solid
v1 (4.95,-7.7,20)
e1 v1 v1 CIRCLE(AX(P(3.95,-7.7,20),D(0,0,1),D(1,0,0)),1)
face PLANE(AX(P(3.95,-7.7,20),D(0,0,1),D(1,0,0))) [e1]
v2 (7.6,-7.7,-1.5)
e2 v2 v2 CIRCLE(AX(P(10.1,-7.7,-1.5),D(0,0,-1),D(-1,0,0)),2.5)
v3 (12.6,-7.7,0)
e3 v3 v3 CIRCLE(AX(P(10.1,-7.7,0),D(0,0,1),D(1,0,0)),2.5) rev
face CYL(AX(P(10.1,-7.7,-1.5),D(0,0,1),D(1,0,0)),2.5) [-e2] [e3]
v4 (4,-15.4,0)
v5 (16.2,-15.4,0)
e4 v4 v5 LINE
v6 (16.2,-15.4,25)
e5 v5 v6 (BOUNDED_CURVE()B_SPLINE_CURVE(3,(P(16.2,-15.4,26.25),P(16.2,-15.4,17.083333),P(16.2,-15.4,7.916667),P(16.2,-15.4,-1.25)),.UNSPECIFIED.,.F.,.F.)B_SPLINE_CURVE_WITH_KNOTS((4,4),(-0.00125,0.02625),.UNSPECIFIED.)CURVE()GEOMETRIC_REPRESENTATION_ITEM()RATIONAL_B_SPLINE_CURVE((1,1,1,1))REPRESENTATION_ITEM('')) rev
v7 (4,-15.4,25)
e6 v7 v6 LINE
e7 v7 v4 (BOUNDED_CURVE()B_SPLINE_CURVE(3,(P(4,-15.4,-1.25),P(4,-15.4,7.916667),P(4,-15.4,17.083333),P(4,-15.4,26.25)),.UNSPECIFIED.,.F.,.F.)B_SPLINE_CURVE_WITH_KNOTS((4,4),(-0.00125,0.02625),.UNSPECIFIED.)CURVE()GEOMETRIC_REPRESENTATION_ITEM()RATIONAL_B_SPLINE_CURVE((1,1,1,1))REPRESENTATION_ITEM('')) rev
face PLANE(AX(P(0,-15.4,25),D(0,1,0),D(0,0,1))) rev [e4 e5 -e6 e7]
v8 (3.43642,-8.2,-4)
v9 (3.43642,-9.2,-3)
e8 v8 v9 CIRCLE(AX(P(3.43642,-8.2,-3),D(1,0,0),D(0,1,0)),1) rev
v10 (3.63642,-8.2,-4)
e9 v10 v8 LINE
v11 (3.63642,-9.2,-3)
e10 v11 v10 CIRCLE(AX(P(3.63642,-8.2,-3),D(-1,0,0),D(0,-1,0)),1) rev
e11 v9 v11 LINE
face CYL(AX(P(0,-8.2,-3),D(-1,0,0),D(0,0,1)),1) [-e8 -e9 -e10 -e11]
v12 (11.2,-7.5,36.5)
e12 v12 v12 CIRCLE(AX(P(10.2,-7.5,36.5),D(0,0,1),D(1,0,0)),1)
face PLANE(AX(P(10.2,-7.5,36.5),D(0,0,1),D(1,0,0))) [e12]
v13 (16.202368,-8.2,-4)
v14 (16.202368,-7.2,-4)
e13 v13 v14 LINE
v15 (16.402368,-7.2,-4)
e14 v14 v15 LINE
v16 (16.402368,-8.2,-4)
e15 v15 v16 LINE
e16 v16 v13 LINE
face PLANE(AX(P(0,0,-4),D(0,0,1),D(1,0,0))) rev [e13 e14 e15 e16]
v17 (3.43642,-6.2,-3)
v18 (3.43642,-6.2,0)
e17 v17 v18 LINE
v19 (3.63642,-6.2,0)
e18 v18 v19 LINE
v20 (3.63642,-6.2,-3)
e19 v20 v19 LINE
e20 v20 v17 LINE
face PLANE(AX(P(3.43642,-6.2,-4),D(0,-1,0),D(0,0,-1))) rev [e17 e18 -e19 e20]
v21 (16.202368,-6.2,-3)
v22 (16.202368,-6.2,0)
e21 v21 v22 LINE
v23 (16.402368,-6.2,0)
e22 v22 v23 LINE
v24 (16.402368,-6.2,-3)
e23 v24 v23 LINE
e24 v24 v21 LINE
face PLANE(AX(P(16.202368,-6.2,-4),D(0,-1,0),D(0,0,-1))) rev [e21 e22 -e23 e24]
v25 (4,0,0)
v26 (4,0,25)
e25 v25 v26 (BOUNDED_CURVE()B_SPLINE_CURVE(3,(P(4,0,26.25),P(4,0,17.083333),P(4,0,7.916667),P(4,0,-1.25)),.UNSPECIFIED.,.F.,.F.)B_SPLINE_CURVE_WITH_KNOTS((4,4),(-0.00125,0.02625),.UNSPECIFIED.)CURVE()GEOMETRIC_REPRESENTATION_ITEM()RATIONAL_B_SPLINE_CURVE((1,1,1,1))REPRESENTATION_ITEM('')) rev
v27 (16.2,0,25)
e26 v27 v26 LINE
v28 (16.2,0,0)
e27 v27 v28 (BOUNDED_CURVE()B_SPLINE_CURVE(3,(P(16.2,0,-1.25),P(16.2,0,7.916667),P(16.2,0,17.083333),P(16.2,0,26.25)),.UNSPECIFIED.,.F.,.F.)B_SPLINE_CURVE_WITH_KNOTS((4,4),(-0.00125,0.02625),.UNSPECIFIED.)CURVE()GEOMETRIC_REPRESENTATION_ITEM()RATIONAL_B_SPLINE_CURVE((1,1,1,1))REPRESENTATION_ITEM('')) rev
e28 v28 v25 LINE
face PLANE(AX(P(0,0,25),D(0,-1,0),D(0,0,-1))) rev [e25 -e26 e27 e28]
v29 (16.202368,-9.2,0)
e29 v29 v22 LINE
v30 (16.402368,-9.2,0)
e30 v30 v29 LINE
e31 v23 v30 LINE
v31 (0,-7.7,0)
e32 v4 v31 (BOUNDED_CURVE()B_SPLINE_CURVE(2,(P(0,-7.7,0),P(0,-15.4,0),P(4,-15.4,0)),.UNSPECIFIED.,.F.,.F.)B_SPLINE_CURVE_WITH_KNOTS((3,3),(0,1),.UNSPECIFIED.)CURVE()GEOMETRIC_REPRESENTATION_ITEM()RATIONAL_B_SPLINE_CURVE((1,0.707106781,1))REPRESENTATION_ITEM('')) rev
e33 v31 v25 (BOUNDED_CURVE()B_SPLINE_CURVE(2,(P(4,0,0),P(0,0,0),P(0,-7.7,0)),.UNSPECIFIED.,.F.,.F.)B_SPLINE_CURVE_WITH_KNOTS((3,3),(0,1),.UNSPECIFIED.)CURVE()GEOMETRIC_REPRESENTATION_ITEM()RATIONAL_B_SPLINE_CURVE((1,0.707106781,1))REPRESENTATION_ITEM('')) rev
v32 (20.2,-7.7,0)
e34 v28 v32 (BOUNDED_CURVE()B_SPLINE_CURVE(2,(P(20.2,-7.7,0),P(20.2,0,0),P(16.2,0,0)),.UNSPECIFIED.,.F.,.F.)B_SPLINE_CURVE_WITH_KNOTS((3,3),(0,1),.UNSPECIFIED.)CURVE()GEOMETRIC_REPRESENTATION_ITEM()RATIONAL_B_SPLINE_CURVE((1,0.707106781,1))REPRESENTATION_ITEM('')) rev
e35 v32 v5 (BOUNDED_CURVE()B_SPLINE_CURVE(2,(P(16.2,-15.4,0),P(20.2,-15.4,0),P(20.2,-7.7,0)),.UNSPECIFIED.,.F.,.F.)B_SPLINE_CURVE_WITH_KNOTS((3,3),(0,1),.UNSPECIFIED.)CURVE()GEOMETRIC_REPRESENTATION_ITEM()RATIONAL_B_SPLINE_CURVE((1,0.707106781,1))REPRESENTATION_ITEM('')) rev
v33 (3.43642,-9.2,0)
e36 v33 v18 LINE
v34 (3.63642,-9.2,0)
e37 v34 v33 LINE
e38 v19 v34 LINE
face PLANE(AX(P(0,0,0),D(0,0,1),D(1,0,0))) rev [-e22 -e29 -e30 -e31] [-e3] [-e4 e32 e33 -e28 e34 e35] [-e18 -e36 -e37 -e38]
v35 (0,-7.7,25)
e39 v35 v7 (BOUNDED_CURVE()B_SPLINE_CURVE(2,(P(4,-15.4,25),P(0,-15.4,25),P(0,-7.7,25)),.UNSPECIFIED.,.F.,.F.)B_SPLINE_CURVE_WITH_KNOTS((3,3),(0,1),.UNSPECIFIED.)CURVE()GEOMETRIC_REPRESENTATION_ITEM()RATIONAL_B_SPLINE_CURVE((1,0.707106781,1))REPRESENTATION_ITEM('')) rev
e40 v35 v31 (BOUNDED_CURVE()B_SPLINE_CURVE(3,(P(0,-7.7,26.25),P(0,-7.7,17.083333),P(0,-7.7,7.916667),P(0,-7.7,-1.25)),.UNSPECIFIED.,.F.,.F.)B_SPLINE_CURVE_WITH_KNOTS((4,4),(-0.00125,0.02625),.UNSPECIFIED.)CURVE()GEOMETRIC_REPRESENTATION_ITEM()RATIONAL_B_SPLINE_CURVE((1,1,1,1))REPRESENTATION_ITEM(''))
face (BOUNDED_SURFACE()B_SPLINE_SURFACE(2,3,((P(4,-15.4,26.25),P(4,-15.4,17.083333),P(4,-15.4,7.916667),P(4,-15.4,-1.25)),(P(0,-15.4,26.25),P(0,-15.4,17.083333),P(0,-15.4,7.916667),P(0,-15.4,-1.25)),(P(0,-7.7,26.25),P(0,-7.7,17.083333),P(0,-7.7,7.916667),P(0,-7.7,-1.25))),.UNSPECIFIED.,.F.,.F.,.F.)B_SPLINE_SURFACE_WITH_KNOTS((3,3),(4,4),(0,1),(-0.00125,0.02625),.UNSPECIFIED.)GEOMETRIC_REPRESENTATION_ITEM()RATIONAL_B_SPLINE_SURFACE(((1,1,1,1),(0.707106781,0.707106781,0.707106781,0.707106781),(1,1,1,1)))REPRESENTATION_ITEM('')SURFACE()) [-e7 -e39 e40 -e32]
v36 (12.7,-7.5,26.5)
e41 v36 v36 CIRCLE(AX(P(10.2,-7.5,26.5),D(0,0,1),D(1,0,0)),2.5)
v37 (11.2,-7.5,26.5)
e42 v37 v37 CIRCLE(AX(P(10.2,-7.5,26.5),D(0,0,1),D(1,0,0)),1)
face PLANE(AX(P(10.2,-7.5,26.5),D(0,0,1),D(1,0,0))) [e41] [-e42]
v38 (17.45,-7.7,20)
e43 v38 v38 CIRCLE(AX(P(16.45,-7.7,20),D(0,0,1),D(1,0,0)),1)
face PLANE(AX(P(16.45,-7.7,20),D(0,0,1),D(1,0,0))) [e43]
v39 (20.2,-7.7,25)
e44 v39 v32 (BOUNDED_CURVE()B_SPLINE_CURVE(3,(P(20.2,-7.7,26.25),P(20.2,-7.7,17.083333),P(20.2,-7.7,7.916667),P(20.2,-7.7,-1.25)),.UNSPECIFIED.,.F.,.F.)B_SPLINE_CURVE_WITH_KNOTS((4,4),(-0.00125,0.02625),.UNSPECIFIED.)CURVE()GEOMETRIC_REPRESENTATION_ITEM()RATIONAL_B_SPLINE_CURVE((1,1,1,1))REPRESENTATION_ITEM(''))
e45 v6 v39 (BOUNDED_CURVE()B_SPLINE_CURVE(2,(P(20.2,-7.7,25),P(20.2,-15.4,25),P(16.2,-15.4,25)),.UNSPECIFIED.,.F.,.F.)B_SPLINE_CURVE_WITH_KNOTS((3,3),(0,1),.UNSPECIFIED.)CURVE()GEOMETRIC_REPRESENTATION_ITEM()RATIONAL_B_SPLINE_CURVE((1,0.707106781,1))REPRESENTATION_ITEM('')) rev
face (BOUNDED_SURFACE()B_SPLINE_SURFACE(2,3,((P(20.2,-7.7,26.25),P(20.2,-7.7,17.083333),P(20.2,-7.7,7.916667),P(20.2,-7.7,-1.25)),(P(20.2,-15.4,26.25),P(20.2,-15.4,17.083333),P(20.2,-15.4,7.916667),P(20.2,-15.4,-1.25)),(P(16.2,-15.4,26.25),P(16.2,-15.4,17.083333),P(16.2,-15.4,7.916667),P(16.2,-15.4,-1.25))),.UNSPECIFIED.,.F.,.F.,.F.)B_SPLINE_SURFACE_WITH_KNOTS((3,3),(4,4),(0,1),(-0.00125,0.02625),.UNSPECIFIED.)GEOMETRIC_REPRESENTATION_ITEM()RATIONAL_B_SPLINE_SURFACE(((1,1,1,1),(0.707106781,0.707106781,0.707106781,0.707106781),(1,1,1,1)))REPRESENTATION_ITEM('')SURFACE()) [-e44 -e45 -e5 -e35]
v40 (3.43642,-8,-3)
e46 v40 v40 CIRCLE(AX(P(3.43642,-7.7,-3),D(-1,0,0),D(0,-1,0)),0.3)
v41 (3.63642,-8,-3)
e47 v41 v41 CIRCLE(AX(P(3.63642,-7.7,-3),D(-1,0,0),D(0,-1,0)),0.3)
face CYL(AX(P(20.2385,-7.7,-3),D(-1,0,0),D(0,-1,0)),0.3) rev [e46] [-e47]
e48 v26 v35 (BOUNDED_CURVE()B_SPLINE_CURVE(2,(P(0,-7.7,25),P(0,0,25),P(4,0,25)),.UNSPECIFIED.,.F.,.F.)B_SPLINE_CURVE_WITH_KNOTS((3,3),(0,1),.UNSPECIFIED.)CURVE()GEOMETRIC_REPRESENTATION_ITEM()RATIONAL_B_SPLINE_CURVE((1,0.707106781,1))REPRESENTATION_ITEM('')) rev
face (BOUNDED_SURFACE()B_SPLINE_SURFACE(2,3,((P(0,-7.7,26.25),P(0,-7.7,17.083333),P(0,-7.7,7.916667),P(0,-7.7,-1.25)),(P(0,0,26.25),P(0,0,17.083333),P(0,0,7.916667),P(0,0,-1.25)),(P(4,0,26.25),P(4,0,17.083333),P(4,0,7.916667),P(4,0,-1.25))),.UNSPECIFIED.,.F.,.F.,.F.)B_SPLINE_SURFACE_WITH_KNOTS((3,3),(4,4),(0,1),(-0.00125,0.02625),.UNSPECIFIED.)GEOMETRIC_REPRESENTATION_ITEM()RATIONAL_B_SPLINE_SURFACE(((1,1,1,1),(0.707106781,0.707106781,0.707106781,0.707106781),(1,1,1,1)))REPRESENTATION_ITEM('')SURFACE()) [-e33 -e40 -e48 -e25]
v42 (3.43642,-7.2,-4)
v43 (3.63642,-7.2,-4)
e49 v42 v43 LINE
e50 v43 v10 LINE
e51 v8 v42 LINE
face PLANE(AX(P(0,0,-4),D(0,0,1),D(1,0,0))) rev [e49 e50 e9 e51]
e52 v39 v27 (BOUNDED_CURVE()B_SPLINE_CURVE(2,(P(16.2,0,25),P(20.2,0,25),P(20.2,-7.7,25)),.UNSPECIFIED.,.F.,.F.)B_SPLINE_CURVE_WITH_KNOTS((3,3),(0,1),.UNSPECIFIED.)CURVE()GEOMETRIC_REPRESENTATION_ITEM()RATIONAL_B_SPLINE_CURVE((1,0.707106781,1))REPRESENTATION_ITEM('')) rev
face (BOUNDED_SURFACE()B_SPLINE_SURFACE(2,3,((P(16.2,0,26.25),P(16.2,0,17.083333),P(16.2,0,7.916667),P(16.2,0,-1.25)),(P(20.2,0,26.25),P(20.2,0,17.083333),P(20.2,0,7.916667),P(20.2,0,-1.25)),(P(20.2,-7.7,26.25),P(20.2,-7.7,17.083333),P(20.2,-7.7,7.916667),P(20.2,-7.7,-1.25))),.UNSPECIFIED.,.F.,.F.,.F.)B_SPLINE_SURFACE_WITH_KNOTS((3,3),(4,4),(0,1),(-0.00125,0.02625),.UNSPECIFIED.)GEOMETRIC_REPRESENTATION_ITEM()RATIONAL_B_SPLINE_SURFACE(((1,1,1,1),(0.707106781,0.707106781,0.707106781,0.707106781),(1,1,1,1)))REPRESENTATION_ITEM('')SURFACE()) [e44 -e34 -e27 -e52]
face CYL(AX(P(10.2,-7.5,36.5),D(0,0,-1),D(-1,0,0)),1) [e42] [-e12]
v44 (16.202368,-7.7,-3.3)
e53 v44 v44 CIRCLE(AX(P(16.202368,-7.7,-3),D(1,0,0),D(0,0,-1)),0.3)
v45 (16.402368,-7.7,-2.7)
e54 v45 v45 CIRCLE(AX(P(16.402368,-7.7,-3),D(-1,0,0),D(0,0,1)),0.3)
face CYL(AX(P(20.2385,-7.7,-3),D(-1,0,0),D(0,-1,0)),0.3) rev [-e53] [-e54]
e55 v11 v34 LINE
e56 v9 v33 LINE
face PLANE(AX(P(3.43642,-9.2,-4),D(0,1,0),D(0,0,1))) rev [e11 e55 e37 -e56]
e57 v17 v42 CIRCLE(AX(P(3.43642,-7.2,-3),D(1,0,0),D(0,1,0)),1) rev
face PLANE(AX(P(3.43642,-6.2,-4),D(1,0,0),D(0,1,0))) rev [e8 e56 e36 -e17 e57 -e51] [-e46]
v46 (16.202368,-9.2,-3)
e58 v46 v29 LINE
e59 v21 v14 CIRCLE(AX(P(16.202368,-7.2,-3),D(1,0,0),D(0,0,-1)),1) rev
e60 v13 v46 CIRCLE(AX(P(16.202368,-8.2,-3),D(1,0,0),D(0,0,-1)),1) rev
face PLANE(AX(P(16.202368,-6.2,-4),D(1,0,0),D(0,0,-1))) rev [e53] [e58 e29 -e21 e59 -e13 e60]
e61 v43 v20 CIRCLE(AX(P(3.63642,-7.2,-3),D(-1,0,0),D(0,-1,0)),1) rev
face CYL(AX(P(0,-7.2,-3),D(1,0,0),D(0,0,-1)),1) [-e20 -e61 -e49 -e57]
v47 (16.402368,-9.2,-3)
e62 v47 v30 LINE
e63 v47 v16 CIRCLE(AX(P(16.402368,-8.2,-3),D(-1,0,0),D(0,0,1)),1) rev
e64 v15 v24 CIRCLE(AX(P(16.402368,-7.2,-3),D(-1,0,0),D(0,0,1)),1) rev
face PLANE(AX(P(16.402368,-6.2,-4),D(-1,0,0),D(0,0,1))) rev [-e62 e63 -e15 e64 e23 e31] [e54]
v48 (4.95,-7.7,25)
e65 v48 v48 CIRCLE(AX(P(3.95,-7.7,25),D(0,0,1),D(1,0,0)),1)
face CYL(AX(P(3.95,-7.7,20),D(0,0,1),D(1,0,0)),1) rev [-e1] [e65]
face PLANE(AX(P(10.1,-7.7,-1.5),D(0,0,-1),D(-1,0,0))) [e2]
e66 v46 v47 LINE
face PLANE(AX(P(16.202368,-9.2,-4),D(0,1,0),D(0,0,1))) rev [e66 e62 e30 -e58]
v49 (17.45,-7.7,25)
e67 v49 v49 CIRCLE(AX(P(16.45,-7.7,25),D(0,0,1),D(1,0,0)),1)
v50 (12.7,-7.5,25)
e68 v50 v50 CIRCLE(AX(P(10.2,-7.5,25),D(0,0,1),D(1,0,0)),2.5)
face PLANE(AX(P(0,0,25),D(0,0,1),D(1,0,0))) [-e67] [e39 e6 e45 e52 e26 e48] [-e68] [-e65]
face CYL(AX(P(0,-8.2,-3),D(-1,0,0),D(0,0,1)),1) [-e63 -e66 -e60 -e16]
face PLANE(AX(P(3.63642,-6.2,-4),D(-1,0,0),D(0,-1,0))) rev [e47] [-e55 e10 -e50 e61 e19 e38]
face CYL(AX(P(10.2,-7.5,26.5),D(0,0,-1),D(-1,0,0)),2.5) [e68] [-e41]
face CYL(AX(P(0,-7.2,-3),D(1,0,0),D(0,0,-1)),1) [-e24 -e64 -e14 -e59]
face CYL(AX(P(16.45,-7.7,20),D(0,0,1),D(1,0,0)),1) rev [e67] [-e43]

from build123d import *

# Parameters (mm, degrees)
SKETCH_1_W          = 20.2
SKETCH_1_H          = 15.4
EXTRUDE_1_DEPTH     = 25
SKETCH_2_R          = 2.5
EXTRUDE_2_DEPTH     = 1.5
SKETCH_3_R          = 1
EXTRUDE_3_DEPTH     = 10
FILLET_2_SIZE       = 7.7
FILLET_2_SIZE_2     = 4
FILLET_3_SIZE       = 4
FILLET_3_SIZE_2     = 7.7
SKETCH_4_R          = 1
CUT_EXTRUDE_1_DEPTH = 5
SKETCH_5_R          = 2.5
EXTRUDE_4_DEPTH     = 1.5
SKETCH_6_W          = 0.2
SKETCH_6_H          = 3
EXTRUDE_5_DEPTH     = 4
FILLET_4_R          = 1
SKETCH_7_R          = 0.3
CUT_EXTRUDE_2_DEPTH = 44.016597153


with BuildPart() as part:
    # 草图1 → 凸台-拉伸1 (new body)
    with BuildSketch(Plane.XY):
        with Locations((10.1, -7.7)):
            Rectangle(SKETCH_1_W, SKETCH_1_H)
    extrude(amount=EXTRUDE_1_DEPTH)

    # 草图2 → 凸台-拉伸2 (add)
    with BuildSketch(Plane.XY.offset(25)):
        with Locations((10.2, -7.5)):
            Circle(SKETCH_2_R)
    extrude(amount=EXTRUDE_2_DEPTH)

    # 草图3 → 凸台-拉伸3 (add)
    with BuildSketch(Plane.XY.offset(26.5)):
        with Locations((10.2, -7.5)):
            Circle(SKETCH_3_R)
    extrude(amount=EXTRUDE_3_DEPTH)

    # 圆角2
    # an asymmetric fillet: 7.7, 4 mm, written as the material it takes off along each edge
    with BuildSketch(Plane(origin=(20.2, -15.4, -19.25), x_dir=(0, 1, 0), z_dir=(0, 0, 1))) as fillet_2_piece_1:
        with BuildLine():
            Bezier((FILLET_2_SIZE, 0), (0, 0), (0, FILLET_2_SIZE_2), weights=[1, 0.707106781, 1])
            Line((0, FILLET_2_SIZE_2), (0, 0))
            Line((0, 0), (FILLET_2_SIZE, 0))
        make_face()
    extrude(amount=63.5, mode=Mode.SUBTRACT)
    with BuildSketch(Plane(origin=(0, 0, -19.25), x_dir=(1, 0, 0), z_dir=(0, 0, 1))) as fillet_2_piece_2:
        with BuildLine():
            Bezier((FILLET_2_SIZE_2, 0), (0, 0), (0, -FILLET_2_SIZE), weights=[1, 0.707106781, 1])
            Line((0, -FILLET_2_SIZE), (0, 0))
            Line((0, 0), (FILLET_2_SIZE_2, 0))
        make_face()
    extrude(amount=63.5, mode=Mode.SUBTRACT)

    # 圆角3
    # an asymmetric fillet: 7.7, 4 mm, written as the material it takes off along each edge
    with BuildSketch(Plane(origin=(20.2, 0, -19.25), x_dir=(-1, 0, 0), z_dir=(0, 0, 1)), Plane(origin=(0, -15.4, -19.25), x_dir=(1, 0, 0), z_dir=(0, 0, 1))) as fillet_3_piece_1:
        with BuildLine():
            Bezier((FILLET_3_SIZE, 0), (0, 0), (0, FILLET_3_SIZE_2), weights=[1, 0.707106781, 1])
            Line((0, FILLET_3_SIZE_2), (0, 0))
            Line((0, 0), (FILLET_3_SIZE, 0))
        make_face()
    extrude(amount=63.5, mode=Mode.SUBTRACT)

    # 草图4 → 切除-拉伸1 (cut)
    with BuildSketch(Plane.XY.offset(25)):
        with Locations((3.95, -7.7)):
            Circle(SKETCH_4_R)
        with Locations((16.45, -7.7)):
            Circle(SKETCH_4_R)
    extrude(amount=-CUT_EXTRUDE_1_DEPTH, mode=Mode.SUBTRACT)

    # 草图5 → 凸台-拉伸4 (add)
    with BuildSketch(Plane(origin=(0, 0, 0), x_dir=(-1, 0, 0), z_dir=(0, 0, -1))):
        with Locations(Location((-10.1, -7.7, 0), (0, 0, 180))):
            Circle(SKETCH_5_R)
    extrude(amount=EXTRUDE_4_DEPTH)

    # 草图6 → 凸台-拉伸5 (add)
    with BuildSketch(Plane(origin=(0, 0, 0), x_dir=(-1, 0, 0), z_dir=(0, 0, -1))):
        with Locations((-3.536419709, -7.7)):
            Rectangle(SKETCH_6_W, SKETCH_6_H)
        with Locations((-16.302368295, -7.7)):
            Rectangle(SKETCH_6_W, SKETCH_6_H)
    extrude(amount=EXTRUDE_5_DEPTH)

    # 圆角4
    fillet_4_edges = [part.edges().sort_by_distance(p)[0] for p in [
        (3.536419709, -6.2, -4),
        (3.536419709, -9.2, -4),
        (16.302368295, -6.2, -4),
        (16.302368295, -9.2, -4),
    ]]
    fillet(fillet_4_edges, radius=FILLET_4_R)

    # 草图7 → 切除-拉伸2 (cut, through all)
    with BuildSketch(Plane.ZY.offset(-3.436419709)):
        with Locations((-3, -7.7)):
            Circle(SKETCH_7_R)
    extrude(amount=-CUT_EXTRUDE_2_DEPTH, mode=Mode.SUBTRACT)


solid = part.part
